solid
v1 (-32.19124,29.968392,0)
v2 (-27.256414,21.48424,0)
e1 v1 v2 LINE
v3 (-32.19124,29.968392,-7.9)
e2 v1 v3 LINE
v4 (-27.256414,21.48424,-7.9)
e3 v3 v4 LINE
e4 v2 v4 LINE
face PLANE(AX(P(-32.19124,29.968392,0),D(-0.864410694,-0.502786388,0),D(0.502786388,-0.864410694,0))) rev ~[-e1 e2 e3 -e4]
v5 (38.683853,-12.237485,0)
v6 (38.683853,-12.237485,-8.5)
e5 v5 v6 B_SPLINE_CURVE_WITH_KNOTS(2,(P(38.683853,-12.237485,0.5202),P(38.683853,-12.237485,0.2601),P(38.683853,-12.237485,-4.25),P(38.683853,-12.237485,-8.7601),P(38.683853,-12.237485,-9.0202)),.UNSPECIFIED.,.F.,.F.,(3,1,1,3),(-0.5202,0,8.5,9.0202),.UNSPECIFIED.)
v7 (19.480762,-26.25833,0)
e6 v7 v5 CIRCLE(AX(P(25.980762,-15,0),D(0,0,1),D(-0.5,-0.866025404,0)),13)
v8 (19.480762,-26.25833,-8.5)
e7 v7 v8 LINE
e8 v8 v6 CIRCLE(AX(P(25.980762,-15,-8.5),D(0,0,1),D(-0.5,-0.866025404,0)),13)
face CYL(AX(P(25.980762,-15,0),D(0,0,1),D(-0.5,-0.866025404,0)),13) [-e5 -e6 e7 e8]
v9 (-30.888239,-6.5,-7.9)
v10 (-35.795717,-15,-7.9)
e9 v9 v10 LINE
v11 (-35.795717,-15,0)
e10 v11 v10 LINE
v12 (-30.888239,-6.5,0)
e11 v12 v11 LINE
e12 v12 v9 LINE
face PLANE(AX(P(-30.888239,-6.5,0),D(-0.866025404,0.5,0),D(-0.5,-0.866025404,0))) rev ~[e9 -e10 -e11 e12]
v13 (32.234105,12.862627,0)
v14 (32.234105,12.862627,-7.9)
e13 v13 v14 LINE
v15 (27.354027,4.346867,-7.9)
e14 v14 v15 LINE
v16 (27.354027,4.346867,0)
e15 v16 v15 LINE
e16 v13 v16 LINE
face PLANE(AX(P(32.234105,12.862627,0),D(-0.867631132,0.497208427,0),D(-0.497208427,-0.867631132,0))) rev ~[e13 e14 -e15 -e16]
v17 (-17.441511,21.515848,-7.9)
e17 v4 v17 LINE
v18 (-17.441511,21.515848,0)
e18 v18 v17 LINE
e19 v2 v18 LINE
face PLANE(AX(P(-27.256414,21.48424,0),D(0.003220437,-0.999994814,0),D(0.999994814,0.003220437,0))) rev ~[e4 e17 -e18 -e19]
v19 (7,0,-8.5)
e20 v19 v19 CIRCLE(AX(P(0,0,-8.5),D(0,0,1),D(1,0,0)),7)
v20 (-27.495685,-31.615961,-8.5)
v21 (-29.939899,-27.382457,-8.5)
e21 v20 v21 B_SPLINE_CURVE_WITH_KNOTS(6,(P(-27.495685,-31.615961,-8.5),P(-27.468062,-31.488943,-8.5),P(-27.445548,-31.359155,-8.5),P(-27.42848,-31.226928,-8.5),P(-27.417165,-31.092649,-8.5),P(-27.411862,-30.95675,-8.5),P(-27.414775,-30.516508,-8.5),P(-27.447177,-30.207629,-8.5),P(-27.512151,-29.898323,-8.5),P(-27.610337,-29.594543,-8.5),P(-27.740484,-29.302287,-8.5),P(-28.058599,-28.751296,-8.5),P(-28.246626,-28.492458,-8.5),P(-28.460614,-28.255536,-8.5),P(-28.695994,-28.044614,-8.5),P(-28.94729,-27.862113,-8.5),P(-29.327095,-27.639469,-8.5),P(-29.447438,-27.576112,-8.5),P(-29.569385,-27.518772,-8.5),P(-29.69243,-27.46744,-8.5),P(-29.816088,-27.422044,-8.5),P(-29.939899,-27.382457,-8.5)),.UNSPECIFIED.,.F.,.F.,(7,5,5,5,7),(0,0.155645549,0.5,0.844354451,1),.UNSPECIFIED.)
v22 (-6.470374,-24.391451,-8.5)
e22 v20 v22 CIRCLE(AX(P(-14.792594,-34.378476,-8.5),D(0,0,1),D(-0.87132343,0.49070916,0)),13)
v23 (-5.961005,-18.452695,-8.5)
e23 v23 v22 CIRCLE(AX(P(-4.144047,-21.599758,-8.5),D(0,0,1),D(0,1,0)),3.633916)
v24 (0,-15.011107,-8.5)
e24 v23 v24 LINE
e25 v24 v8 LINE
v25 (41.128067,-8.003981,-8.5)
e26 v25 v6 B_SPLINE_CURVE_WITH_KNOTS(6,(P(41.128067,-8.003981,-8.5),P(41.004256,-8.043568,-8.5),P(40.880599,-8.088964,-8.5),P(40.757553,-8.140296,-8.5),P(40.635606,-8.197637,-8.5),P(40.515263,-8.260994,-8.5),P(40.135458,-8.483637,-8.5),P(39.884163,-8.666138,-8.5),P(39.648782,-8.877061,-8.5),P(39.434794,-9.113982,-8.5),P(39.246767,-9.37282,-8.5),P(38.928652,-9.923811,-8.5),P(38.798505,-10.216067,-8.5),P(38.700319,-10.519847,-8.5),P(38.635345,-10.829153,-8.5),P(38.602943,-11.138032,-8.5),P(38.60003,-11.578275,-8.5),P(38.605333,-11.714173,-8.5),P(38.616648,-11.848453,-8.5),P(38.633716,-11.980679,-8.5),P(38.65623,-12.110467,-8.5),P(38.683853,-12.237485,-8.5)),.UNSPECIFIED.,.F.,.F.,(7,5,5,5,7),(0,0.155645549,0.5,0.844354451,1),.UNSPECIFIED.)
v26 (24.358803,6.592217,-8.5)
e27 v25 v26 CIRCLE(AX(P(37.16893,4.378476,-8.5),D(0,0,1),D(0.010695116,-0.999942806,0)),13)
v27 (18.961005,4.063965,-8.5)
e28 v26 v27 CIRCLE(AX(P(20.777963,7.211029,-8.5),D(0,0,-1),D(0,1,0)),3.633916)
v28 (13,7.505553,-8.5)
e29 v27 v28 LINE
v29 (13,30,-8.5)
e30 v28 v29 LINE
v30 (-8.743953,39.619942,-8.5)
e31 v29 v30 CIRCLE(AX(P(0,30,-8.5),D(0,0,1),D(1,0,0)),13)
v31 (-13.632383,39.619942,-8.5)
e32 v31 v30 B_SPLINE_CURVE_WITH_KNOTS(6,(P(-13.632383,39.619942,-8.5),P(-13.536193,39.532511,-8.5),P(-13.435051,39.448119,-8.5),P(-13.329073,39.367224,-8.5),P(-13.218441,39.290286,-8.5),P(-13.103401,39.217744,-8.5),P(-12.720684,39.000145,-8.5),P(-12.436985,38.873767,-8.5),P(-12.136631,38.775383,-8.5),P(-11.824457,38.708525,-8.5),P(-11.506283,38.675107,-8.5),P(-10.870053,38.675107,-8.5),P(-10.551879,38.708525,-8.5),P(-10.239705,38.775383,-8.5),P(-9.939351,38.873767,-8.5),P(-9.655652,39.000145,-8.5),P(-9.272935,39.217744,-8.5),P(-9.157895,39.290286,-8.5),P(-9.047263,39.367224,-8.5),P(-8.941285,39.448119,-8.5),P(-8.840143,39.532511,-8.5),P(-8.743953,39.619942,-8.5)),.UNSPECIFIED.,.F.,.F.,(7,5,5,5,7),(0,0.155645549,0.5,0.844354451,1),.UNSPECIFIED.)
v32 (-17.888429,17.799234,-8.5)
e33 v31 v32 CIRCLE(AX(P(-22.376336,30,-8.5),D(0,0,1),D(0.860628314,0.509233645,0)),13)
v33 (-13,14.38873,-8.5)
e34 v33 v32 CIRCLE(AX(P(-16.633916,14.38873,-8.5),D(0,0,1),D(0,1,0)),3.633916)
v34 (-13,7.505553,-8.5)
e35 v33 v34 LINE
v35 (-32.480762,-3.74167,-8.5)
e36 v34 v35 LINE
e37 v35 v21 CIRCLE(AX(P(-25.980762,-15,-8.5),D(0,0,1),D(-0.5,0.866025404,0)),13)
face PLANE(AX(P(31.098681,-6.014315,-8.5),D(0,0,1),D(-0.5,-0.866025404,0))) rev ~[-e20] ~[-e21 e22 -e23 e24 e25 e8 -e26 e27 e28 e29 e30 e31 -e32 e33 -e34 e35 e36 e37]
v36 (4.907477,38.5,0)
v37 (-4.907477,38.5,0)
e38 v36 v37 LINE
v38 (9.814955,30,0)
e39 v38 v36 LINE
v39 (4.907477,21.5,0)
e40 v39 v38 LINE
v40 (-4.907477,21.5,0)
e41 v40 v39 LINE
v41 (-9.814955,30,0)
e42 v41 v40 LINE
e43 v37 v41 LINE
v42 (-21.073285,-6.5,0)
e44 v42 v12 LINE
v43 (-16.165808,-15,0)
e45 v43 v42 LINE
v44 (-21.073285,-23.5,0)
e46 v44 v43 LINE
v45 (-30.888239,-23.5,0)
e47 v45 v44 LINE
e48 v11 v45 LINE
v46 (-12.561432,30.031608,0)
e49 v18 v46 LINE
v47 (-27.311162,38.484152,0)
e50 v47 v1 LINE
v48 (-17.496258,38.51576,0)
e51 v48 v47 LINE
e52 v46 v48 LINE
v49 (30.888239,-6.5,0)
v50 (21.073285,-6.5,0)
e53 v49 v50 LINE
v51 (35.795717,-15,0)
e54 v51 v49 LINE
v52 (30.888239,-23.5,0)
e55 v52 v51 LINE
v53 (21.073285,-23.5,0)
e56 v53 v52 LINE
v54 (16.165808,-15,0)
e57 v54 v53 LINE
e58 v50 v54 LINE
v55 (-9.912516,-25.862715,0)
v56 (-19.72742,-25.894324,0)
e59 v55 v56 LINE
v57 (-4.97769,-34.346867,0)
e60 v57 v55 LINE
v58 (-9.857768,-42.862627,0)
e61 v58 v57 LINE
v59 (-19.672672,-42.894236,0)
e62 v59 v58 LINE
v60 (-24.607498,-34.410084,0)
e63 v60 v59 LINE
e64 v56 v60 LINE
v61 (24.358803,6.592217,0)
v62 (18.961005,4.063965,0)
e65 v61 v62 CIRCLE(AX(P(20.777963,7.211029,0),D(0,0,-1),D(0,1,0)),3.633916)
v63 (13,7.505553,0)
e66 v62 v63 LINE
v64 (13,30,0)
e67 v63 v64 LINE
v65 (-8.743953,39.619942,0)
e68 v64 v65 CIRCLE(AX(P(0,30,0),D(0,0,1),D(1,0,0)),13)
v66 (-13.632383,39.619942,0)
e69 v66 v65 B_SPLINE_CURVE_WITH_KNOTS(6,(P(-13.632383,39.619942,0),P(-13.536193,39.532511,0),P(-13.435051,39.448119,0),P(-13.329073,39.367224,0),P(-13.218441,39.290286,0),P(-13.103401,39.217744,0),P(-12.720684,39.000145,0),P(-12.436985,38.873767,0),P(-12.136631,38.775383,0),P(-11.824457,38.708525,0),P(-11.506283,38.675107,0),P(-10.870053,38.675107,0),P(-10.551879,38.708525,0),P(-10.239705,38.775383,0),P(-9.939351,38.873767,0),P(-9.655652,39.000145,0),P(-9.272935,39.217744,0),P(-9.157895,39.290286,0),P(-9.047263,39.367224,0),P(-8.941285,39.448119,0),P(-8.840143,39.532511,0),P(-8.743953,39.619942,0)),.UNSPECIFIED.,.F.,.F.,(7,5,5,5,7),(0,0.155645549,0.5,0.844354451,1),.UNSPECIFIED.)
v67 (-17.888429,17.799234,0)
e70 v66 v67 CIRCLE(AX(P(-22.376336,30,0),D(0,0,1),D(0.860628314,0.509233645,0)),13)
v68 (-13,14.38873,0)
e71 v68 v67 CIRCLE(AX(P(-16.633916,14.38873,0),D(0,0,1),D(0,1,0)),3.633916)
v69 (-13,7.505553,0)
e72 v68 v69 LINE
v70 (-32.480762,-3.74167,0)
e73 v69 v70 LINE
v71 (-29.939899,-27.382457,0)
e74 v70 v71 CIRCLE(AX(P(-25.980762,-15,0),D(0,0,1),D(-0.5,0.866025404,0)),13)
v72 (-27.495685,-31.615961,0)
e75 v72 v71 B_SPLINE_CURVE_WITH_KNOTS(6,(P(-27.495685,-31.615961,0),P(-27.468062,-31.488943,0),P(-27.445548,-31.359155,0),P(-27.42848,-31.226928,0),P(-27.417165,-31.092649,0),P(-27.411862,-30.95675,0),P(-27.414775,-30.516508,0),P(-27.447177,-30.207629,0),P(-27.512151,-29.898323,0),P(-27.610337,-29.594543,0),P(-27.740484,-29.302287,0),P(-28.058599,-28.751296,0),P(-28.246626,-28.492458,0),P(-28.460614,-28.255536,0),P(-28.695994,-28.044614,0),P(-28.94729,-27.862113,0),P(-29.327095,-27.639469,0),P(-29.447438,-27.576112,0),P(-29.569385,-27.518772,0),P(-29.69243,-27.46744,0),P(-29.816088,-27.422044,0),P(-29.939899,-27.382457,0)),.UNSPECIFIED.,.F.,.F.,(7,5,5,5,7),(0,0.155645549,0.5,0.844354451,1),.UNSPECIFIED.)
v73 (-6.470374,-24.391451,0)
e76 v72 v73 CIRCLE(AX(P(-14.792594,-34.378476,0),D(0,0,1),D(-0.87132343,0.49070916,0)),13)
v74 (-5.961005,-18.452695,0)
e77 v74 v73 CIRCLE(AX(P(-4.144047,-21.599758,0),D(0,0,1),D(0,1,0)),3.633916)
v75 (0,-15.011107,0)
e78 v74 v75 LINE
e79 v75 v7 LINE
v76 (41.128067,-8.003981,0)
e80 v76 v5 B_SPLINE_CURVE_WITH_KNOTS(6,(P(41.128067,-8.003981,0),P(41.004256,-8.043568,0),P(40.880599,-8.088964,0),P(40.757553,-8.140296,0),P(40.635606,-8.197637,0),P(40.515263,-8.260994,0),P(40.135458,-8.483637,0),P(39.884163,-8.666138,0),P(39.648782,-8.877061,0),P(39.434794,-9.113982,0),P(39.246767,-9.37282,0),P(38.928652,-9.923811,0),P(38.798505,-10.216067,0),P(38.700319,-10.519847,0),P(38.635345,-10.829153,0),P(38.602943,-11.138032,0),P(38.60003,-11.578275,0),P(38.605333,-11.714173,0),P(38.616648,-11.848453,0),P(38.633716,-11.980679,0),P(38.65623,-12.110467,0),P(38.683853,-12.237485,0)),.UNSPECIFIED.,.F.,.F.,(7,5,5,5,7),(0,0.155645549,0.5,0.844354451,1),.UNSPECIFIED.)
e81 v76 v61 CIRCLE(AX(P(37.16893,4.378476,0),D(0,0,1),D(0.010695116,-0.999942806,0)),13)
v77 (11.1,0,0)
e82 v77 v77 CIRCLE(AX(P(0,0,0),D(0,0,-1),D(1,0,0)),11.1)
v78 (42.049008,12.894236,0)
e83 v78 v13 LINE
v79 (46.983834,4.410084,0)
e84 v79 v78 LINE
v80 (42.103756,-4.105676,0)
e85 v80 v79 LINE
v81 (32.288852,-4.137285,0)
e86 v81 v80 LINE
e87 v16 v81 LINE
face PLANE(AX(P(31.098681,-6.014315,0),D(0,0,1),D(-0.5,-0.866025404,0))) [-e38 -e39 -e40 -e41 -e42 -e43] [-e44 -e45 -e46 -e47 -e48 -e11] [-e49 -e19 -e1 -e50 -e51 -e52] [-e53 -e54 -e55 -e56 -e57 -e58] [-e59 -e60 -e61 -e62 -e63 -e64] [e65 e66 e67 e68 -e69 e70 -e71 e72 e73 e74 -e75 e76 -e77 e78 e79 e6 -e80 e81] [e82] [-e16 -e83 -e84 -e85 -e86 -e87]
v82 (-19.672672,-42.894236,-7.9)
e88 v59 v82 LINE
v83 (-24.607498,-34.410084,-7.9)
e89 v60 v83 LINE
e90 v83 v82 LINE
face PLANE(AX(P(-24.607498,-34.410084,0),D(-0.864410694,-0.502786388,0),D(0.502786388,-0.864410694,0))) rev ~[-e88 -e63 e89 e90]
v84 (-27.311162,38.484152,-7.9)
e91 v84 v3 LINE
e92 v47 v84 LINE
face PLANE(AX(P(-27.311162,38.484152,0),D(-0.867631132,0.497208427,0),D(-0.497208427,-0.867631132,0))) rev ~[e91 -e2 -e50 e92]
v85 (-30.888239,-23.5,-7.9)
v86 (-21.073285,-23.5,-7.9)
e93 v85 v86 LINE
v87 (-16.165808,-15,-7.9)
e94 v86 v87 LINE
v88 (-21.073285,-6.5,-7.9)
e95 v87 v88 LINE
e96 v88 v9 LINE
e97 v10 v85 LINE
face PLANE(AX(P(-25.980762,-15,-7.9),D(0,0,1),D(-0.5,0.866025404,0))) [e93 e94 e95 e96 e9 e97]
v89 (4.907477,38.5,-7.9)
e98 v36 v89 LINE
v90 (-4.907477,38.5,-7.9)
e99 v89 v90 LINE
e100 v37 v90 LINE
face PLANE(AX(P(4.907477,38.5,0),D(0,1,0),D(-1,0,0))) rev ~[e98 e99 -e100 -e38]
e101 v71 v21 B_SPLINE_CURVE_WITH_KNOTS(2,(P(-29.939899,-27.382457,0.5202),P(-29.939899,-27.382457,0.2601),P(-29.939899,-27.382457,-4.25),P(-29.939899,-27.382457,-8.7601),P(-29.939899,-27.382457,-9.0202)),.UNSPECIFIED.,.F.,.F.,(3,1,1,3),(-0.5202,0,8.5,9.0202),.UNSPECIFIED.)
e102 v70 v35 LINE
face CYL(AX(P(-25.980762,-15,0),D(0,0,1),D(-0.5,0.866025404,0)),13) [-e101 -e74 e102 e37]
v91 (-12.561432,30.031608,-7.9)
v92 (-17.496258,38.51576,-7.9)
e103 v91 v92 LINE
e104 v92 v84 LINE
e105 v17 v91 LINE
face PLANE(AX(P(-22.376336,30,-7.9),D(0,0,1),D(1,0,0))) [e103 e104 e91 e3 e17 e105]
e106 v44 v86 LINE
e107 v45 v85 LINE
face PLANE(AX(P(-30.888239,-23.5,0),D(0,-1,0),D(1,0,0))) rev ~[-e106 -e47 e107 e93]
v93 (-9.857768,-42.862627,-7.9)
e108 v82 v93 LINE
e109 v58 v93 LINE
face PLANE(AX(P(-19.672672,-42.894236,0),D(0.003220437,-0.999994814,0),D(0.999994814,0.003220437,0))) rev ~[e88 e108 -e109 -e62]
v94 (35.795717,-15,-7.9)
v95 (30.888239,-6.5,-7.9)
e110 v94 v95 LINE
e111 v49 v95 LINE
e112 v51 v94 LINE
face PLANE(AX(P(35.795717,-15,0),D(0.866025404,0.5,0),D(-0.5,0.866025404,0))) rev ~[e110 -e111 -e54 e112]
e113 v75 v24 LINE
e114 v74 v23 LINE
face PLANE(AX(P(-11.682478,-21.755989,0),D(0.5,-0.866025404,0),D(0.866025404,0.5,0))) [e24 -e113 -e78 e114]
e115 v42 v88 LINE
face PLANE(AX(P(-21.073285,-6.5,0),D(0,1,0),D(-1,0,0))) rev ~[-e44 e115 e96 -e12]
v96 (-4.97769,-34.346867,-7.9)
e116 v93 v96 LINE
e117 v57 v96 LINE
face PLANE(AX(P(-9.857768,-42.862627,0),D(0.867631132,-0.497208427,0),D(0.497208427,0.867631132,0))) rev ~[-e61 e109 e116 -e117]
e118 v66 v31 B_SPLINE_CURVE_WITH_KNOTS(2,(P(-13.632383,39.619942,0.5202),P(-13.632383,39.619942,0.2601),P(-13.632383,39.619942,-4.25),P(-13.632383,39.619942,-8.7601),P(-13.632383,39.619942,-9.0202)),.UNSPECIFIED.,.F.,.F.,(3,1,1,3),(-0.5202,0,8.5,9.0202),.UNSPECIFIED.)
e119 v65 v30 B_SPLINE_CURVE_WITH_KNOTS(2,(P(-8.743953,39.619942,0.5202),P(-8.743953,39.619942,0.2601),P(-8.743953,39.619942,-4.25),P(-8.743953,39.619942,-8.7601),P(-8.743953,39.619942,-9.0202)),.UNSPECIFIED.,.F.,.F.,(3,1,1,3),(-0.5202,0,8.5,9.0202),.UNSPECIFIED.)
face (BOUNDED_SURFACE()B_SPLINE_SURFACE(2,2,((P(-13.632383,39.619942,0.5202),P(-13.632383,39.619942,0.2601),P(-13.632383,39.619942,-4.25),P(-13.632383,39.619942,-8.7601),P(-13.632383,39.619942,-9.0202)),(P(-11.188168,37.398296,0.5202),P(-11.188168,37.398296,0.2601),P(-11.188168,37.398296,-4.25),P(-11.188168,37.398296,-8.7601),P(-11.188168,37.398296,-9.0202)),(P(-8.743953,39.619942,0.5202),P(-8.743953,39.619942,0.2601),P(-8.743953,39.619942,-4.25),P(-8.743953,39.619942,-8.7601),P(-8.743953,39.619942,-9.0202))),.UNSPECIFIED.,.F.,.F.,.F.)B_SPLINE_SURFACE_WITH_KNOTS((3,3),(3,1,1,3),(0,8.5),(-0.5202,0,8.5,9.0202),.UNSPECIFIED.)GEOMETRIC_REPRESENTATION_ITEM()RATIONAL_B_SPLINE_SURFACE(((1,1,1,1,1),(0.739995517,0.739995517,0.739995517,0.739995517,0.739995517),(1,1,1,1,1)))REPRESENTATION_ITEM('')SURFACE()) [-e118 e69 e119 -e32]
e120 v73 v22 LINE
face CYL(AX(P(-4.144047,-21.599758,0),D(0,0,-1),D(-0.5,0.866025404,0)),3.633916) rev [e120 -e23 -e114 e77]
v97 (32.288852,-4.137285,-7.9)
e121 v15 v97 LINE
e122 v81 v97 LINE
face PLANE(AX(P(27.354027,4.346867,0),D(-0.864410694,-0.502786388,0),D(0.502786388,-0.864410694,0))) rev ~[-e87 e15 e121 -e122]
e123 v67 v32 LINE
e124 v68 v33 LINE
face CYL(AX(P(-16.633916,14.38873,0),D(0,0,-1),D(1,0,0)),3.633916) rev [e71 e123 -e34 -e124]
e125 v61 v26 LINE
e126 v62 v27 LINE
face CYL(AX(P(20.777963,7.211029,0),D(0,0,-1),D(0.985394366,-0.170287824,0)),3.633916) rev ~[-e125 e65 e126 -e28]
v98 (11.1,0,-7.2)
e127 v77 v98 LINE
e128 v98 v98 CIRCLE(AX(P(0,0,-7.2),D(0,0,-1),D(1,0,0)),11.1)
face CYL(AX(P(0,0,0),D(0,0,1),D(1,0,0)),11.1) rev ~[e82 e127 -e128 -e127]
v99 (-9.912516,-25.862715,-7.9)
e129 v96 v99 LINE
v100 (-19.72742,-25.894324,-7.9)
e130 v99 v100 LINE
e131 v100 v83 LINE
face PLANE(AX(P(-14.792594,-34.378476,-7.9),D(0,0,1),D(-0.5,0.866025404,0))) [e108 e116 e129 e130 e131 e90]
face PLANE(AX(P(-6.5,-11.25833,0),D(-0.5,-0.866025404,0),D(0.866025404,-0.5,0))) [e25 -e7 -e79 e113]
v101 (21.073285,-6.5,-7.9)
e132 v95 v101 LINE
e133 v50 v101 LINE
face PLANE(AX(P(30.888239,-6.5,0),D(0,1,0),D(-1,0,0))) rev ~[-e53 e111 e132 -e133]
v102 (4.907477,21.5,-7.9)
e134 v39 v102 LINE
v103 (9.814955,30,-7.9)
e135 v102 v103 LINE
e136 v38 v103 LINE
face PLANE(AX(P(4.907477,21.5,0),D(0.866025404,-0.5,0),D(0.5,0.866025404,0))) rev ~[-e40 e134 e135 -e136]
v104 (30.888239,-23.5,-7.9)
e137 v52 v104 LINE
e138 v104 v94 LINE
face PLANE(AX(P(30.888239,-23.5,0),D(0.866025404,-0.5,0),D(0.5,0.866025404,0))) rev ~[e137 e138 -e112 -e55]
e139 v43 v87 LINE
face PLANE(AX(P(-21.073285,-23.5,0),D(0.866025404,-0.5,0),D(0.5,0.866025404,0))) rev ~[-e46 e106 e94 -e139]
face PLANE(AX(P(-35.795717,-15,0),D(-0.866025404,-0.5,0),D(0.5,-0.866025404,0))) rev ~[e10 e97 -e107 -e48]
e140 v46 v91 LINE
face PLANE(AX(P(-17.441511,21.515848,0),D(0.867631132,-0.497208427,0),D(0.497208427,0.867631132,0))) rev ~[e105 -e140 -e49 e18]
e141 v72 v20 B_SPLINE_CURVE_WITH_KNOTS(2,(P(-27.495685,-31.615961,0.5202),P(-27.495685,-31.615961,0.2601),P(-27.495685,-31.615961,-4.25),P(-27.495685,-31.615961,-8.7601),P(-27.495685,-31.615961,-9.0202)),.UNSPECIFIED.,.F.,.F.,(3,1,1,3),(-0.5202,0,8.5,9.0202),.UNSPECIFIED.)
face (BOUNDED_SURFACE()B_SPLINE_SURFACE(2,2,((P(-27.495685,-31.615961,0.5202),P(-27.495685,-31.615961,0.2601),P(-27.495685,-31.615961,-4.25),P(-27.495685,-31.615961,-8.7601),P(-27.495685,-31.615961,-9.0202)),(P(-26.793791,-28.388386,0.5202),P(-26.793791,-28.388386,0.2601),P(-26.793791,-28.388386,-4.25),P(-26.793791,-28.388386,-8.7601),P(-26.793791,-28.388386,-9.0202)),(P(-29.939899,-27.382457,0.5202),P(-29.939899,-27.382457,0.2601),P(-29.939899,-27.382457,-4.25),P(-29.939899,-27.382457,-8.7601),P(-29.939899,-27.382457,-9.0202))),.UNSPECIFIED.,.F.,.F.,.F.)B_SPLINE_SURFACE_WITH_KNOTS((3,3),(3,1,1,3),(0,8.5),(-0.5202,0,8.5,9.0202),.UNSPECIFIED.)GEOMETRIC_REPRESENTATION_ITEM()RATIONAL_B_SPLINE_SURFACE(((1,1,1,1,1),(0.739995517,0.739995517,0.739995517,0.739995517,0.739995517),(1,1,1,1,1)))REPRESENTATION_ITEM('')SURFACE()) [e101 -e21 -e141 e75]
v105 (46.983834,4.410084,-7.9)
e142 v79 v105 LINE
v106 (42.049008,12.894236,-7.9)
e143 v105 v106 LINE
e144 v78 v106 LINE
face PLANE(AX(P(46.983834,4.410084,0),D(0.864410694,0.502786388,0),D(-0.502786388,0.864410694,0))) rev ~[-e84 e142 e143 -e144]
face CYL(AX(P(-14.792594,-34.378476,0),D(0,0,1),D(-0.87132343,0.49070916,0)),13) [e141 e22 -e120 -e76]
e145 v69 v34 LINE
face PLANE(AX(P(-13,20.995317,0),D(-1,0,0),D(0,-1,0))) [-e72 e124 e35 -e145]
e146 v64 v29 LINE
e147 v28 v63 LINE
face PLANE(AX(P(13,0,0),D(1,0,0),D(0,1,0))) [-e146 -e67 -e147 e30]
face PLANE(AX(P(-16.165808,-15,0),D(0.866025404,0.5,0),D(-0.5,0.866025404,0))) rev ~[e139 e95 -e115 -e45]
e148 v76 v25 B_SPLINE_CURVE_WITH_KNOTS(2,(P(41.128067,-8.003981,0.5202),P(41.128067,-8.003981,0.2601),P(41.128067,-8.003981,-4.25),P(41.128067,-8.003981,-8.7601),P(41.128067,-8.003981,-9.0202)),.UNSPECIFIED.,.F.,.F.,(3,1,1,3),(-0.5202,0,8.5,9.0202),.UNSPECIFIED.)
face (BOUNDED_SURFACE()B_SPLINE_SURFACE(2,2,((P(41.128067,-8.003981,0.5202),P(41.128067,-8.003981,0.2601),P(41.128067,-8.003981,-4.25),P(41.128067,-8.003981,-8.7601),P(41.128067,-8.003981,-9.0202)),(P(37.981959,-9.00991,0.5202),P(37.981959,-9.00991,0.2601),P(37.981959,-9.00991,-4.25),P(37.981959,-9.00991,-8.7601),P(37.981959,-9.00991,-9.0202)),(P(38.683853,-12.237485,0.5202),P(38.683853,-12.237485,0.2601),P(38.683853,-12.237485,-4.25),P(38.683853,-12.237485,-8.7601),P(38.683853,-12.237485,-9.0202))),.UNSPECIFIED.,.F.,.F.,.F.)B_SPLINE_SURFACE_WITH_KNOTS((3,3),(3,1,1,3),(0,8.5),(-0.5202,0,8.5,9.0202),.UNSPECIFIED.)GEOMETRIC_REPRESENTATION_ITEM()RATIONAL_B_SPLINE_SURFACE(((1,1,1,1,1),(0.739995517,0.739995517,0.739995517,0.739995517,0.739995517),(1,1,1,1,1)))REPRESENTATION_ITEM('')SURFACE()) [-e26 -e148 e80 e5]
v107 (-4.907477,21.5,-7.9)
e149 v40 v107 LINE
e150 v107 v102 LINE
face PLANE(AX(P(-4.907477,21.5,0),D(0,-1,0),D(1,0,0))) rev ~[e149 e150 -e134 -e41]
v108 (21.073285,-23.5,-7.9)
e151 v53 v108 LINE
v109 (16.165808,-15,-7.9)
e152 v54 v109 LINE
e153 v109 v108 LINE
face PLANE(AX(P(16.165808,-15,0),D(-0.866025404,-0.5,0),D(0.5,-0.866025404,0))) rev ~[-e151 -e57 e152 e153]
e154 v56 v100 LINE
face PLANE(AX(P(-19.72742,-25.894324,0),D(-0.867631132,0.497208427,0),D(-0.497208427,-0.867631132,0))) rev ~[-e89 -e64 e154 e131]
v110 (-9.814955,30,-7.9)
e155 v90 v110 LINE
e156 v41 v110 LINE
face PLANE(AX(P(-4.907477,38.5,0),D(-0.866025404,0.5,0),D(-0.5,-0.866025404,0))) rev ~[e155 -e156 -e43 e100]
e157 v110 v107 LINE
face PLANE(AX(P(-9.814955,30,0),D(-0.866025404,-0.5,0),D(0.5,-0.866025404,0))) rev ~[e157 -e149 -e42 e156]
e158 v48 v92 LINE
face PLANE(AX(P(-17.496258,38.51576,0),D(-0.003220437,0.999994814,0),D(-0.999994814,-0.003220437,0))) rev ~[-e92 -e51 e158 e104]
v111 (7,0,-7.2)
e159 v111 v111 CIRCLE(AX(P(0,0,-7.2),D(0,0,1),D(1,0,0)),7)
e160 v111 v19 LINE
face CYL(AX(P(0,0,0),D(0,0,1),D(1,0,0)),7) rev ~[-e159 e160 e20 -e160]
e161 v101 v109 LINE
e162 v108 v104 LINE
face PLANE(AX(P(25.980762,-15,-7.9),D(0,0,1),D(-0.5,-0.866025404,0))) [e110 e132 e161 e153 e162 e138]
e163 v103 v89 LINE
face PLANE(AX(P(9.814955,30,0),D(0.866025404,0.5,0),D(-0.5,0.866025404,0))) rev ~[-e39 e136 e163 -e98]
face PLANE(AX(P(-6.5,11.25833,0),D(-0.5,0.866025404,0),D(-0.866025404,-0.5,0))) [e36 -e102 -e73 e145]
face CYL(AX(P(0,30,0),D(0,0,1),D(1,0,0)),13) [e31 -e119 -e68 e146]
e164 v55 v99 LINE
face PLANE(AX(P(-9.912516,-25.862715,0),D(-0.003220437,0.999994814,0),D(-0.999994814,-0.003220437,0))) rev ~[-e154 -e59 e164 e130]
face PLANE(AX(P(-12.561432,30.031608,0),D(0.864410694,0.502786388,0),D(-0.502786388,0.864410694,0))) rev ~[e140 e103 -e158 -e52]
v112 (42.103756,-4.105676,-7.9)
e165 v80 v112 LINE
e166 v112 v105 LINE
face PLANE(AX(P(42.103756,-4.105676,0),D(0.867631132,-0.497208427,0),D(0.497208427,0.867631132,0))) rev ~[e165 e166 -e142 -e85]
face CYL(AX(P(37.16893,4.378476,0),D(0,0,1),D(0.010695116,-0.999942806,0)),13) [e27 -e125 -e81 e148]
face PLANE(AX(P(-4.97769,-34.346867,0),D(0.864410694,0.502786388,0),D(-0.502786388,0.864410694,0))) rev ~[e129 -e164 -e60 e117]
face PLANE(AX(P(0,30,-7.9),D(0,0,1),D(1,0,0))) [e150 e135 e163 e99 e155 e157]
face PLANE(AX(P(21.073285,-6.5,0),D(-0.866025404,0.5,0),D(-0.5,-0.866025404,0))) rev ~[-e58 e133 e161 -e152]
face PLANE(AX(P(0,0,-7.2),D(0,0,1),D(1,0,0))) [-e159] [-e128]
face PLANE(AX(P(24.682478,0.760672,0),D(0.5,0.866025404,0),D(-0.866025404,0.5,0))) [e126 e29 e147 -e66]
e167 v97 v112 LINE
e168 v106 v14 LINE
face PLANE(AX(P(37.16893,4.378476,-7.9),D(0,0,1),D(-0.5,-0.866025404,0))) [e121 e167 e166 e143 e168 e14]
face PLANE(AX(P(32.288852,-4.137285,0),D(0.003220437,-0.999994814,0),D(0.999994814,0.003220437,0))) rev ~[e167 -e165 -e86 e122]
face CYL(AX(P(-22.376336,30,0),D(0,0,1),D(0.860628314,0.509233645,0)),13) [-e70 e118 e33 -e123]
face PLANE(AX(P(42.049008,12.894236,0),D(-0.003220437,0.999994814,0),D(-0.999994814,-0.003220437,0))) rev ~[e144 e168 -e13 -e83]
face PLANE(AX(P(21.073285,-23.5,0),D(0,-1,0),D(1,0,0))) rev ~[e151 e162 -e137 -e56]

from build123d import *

# Parameters (mm, degrees)
F0_R     = 11.1
F0_R_2   = 7
F1_DEPTH = 8.5
F2_DEPTH = 7.9
F3_DEPTH = 7.2
F4_COUNT = 3
F5_R     = 3.6339158304


# Not quite as in the source:
# - a feature names something its author has since deleted; it is built from what else it names


with BuildPart() as f1:
    # F0 (on Top) → F1 (new body)
    with BuildSketch(Plane.XY):
        with BuildLine():
            ThreePointArc((-11.1881680787, 23.3799626101), (3.4317499164, 17.4611367137), (13, 30))
            ThreePointArc((13, 30), (3.4317499164, 42.5388632863), (-11.1881680787, 36.6200373899))
            ThreePointArc((-11.1881680787, 36.6200373899), (-35.2898051844, 31.4974370391), (-13, 20.9953167593))
            ThreePointArc((-13, 20.9953167593), (-12.0251844061, 22.1352903789), (-11.1881680787, 23.3799626101))
        make_face()
        Polygon((-17.4962580338, 38.5157601447), (-12.5614324777, 30.0316084449), (-17.4415106013, 21.5158483002), (-27.2564142809, 21.4842398553), (-32.1912398369, 29.9683915551), (-27.3111617133, 38.4841516998), align=None, mode=Mode.SUBTRACT)
        Polygon((4.9074772881, 38.5), (9.8149545762, 30), (4.9074772881, 21.5), (-4.9074772881, 21.5), (-9.8149545762, 30), (-4.9074772881, 38.5), align=None, mode=Mode.SUBTRACT)
        with BuildLine():
            ThreePointArc((-13, 0), (0, -13), (13, 0))
            ThreePointArc((13, 0), (0, 13), (-13, 0))
        make_face()
        Circle(F0_R, mode=Mode.SUBTRACT)
        Circle(F0_R)
        Circle(F0_R_2, mode=Mode.SUBTRACT)
        Polygon((4.9074772881, 21.5), (9.8149545762, 30), (4.9074772881, 38.5), (-4.9074772881, 38.5), (-9.8149545762, 30), (-4.9074772881, 21.5), align=None)
        Polygon((-17.4415106013, 21.5158483002), (-12.5614324777, 30.0316084449), (-17.4962580338, 38.5157601447), (-27.3111617133, 38.4841516998), (-32.1912398369, 29.9683915551), (-27.2564142809, 21.4842398553), align=None)
        with BuildLine():
            ThreePointArc((-13, 0), (0, 13), (13, 0))
            Line((13, 0), (13, 30))
            ThreePointArc((13, 30), (3.4317499164, 17.4611367137), (-11.1881680787, 23.3799626101))
            ThreePointArc((-11.1881680787, 23.3799626101), (-12.0251844061, 22.1352903789), (-13, 20.9953167593))
            Line((-13, 20.9953167593), (-13, 0))
        make_face()
    extrude(amount=-F1_DEPTH)

    # F0 (on Top) → F2 (cut)
    with BuildSketch(Plane.XY):
        Polygon((4.9074772881, 21.5), (9.8149545762, 30), (4.9074772881, 38.5), (-4.9074772881, 38.5), (-9.8149545762, 30), (-4.9074772881, 21.5), align=None)
        Polygon((-17.4415106013, 21.5158483002), (-12.5614324777, 30.0316084449), (-17.4962580338, 38.5157601447), (-27.3111617133, 38.4841516998), (-32.1912398369, 29.9683915551), (-27.2564142809, 21.4842398553), align=None)
    extrude(amount=-F2_DEPTH, mode=Mode.SUBTRACT)

    # F0 (on Top) → F3 (cut)
    with BuildSketch(Plane.XY):
        Circle(F0_R)
        Circle(F0_R_2, mode=Mode.SUBTRACT)
    extrude(amount=-F3_DEPTH, mode=Mode.SUBTRACT)

    # F4: F1 ×3 about axis
    f4_axis = Axis((0, 0, 0), (0, 0, 1))


with BuildPart() as f1_1:
    add(f1.part)
    for i in range(1, F4_COUNT):
        add(f1.part.rotate(f4_axis, i * 360 / F4_COUNT))

    # F5
    f5_edges = [f1_1.edges().sort_by_distance(p)[0] for p in [
        (-13, 20.995317, -4.25),
        (-11.188168, 36.620037, -4.25),
        (-11.682478, -21.755989, -4.25),
        (-26.119799, -27.999256, -4.25),
        (37.307967, -8.620781, -4.25),
        (24.682478, 0.760672, -4.25),
    ]]
    fillet(f5_edges, radius=F5_R)


solid = f1_1.part
